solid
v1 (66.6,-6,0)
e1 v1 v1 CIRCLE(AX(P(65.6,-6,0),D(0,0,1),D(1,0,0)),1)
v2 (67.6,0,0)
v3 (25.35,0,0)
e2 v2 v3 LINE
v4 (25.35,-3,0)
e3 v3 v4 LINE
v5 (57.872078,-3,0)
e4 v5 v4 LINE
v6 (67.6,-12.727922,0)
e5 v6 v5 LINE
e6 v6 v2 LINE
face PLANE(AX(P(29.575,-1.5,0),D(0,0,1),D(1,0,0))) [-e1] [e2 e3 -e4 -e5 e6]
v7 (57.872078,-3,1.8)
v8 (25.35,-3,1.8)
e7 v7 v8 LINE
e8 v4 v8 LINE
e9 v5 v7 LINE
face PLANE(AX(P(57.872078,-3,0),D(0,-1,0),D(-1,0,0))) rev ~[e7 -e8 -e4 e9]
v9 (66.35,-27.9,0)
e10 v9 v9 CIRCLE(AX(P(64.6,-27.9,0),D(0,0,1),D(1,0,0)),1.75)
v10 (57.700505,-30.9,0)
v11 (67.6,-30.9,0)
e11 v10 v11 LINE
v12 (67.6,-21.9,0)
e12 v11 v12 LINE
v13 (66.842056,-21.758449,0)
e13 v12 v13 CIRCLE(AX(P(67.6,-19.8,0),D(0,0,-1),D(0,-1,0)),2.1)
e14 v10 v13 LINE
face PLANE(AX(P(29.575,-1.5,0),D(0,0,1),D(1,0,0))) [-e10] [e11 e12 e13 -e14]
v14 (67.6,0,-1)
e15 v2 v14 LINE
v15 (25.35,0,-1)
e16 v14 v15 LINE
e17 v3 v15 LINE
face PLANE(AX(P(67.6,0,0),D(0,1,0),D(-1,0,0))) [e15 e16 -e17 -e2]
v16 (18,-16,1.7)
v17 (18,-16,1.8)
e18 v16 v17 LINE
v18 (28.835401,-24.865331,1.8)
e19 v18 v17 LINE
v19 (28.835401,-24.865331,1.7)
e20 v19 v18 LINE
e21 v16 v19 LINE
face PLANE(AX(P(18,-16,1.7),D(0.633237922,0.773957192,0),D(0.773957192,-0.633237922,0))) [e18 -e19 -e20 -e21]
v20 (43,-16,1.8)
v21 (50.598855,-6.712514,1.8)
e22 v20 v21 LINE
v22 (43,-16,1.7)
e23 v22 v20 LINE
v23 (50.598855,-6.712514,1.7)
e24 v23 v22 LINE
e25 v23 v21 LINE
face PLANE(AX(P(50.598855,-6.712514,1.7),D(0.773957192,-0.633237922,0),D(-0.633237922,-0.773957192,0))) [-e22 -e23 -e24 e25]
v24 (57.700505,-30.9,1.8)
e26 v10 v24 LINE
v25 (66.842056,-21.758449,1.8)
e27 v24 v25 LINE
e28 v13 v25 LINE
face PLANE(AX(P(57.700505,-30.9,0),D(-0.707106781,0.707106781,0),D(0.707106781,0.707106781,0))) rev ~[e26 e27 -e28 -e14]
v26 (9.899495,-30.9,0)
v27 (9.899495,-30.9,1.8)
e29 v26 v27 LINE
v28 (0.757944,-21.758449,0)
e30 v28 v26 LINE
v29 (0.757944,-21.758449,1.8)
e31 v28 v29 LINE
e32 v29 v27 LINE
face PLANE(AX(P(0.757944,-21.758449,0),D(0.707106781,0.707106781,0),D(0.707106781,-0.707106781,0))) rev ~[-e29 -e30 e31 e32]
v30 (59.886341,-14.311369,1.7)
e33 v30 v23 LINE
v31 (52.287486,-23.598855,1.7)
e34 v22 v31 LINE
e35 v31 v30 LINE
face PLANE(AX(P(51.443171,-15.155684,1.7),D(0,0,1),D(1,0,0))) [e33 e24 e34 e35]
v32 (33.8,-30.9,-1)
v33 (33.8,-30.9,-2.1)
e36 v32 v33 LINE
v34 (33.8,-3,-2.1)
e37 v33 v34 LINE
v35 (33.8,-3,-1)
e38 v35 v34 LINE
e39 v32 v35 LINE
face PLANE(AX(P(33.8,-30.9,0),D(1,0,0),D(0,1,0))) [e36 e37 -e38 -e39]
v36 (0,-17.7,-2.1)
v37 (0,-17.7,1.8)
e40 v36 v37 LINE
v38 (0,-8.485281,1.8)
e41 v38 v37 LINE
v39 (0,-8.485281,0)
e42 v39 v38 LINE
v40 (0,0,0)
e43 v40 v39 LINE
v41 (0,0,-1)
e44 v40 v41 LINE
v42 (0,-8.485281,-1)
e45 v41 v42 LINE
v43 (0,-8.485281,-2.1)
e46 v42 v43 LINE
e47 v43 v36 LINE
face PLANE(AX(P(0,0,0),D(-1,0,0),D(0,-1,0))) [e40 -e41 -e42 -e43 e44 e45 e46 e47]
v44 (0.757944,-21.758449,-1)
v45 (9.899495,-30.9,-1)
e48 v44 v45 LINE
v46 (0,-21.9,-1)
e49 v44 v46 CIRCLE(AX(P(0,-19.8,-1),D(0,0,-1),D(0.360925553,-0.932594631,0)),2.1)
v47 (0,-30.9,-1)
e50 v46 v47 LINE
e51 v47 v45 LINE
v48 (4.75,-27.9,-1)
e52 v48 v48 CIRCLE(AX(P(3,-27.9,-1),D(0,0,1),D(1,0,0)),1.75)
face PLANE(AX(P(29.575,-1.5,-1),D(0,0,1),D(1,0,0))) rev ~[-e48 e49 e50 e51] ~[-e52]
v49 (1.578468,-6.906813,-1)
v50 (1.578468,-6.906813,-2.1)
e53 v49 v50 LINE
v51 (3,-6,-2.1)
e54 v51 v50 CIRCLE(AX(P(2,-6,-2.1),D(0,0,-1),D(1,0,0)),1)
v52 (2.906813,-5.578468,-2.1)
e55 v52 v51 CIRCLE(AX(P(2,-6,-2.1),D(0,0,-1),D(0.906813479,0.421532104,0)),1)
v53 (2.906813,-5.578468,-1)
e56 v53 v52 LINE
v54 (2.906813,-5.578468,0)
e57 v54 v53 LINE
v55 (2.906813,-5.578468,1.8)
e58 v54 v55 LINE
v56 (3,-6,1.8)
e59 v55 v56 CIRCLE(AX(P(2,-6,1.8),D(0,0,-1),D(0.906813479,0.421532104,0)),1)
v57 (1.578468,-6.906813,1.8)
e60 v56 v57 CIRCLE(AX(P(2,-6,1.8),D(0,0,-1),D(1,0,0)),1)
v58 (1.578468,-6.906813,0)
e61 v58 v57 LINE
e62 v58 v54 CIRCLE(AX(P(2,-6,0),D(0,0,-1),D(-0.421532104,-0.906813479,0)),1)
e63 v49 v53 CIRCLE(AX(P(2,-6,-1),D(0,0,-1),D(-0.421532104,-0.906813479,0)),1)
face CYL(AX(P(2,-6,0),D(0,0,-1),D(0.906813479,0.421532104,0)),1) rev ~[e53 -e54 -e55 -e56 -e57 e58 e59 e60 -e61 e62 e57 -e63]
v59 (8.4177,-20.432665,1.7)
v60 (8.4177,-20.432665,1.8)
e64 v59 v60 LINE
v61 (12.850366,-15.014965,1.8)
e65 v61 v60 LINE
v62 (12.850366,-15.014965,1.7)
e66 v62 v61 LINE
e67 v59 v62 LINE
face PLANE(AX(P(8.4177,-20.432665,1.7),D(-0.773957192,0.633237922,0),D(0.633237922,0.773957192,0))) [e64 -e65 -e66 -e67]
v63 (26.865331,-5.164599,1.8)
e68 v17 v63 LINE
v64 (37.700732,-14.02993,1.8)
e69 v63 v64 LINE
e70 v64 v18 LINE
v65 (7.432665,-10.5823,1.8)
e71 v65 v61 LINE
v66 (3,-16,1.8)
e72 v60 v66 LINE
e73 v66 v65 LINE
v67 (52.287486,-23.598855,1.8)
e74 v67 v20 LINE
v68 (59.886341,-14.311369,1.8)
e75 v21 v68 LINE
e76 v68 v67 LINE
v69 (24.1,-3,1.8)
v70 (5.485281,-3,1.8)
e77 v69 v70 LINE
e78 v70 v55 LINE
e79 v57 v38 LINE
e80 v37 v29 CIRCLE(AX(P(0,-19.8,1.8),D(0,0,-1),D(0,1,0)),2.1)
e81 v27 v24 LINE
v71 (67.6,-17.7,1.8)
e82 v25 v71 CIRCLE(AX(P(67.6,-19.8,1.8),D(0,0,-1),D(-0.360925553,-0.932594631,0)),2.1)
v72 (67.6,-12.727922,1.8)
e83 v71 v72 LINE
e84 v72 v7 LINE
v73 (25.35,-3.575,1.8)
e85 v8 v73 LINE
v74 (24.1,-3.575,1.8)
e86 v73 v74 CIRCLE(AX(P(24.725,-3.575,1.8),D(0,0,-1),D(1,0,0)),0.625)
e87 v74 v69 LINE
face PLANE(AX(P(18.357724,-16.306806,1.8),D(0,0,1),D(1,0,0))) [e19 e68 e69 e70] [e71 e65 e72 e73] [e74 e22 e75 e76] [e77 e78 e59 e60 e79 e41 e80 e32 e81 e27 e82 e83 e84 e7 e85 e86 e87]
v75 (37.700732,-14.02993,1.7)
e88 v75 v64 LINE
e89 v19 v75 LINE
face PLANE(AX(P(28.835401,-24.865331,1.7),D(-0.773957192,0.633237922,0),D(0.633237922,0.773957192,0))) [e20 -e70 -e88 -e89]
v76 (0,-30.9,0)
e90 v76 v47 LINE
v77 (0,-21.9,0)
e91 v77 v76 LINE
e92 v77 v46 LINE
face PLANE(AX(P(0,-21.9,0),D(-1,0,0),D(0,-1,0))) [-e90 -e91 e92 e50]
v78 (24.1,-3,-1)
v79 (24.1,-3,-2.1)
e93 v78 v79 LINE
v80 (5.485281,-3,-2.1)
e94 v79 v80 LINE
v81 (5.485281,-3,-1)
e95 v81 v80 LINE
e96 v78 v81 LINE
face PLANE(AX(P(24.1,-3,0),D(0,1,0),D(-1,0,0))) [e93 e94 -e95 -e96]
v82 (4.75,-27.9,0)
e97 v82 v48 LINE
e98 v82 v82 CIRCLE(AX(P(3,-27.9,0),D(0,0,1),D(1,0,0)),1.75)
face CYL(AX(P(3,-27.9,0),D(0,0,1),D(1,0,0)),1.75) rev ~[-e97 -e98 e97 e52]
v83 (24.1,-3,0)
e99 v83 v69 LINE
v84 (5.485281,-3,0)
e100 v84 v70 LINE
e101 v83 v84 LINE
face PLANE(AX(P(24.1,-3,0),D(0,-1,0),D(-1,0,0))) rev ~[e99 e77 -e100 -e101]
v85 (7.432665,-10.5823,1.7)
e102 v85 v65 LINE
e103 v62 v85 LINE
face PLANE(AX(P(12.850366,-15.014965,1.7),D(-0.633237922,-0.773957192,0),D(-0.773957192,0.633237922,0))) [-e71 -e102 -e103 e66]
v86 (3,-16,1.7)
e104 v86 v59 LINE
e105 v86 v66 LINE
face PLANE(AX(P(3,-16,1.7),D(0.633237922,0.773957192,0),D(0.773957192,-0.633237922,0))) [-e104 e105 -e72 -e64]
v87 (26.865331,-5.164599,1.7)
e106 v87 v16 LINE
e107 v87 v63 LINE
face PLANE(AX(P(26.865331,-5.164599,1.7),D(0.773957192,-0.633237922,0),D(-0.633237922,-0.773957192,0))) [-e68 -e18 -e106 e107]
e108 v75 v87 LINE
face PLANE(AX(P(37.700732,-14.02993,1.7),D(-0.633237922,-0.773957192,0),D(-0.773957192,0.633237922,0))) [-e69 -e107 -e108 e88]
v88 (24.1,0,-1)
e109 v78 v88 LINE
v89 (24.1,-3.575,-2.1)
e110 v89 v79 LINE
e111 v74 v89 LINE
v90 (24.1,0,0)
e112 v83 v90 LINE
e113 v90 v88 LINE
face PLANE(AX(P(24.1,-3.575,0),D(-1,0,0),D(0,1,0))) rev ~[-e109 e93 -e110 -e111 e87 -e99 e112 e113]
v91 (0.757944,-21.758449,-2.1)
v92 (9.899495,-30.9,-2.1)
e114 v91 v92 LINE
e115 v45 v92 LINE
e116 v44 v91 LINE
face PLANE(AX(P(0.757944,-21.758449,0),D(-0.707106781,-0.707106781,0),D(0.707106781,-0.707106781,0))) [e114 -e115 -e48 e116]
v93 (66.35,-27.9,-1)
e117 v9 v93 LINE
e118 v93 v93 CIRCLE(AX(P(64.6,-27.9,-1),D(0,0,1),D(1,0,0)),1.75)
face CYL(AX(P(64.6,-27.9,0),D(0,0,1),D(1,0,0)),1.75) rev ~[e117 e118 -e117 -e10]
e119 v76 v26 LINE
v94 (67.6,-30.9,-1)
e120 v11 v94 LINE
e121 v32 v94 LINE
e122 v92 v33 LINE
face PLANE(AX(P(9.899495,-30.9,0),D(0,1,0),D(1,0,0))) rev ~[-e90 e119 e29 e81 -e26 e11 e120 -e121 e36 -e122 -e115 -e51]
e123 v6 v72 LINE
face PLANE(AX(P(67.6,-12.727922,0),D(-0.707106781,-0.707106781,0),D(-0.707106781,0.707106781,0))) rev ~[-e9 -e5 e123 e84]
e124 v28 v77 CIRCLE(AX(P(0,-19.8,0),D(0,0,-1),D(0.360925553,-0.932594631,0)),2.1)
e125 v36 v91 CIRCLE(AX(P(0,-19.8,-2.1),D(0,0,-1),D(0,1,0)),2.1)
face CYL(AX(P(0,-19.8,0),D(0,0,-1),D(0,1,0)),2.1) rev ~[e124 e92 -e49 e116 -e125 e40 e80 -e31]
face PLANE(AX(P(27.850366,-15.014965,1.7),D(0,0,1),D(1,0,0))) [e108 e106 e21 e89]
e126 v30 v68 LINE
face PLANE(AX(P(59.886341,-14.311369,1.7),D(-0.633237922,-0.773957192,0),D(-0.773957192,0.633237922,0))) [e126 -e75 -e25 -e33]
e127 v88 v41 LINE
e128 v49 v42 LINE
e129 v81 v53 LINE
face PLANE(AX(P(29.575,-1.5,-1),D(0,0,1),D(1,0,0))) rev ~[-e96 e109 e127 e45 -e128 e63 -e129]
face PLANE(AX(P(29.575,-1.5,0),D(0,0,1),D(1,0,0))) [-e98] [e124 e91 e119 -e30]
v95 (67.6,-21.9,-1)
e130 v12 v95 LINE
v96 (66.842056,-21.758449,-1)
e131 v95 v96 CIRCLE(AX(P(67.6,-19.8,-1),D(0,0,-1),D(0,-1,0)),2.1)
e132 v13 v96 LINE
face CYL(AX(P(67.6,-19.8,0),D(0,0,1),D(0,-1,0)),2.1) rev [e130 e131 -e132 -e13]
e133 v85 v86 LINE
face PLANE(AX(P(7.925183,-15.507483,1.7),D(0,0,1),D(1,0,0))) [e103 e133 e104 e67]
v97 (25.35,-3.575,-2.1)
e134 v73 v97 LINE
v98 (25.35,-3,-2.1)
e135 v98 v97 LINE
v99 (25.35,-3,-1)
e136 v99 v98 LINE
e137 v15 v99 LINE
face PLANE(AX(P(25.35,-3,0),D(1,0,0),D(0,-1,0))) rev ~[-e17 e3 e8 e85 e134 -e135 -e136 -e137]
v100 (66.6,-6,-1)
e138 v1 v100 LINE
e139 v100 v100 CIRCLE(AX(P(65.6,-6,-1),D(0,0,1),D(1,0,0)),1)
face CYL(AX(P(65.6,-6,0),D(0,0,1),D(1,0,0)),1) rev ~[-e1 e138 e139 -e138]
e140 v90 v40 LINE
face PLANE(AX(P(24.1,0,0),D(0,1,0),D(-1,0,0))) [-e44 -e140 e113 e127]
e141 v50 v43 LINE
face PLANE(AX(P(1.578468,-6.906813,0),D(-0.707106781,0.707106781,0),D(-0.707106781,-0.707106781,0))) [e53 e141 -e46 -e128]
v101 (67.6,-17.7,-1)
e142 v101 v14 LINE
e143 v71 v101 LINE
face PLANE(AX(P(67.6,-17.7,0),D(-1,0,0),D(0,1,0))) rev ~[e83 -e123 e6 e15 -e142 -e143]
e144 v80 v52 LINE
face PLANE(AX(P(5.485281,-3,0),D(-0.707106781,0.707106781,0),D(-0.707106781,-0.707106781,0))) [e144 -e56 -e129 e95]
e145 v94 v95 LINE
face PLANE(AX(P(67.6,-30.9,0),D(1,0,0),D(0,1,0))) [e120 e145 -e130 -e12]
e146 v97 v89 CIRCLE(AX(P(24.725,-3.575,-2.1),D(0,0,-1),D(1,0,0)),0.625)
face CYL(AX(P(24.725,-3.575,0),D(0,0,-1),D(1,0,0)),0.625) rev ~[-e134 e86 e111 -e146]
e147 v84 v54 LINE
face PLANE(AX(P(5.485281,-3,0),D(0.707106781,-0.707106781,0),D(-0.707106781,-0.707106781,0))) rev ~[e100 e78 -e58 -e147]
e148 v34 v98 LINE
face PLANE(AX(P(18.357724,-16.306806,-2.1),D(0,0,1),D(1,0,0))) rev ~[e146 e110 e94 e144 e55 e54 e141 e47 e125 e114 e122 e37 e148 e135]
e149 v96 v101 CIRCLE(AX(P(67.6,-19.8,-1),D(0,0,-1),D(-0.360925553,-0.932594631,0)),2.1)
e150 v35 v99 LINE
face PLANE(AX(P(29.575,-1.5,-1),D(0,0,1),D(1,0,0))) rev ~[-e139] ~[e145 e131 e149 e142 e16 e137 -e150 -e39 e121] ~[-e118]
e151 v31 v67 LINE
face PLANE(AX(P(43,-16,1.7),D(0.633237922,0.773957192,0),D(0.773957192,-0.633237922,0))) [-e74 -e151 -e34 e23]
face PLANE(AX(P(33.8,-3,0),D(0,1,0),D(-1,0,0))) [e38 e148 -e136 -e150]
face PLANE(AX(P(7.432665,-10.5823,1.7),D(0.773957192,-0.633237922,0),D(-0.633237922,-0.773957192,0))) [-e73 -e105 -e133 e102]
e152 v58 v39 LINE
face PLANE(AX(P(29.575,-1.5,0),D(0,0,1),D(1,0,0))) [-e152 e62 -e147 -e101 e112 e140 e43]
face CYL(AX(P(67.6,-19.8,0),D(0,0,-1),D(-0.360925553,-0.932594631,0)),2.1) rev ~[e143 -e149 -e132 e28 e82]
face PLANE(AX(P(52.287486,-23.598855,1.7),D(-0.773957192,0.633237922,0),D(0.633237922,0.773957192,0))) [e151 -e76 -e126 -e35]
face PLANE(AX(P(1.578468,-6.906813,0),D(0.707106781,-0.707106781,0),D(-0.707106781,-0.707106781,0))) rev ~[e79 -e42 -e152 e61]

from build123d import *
from build123d import SkipClean  # not in build123d's __all__

# Parameters (mm, degrees)
F0_W     = 8.45
F0_H     = 3
F0_R     = 1.75
F0_R_2   = 1
F1_DEPTH = 1
F2_DEPTH = 2.1
F3_DEPTH = 1.8
F5_START = 1.7
F5_DEPTH = 0.3


with BuildPart() as f1:
    # F0 (on Top) → F1 (new body)
    with BuildSketch(Plane.XY):
        with Locations((29.575, -1.5)):
            Rectangle(F0_W, F0_H)
        Polygon((33.8, 0), (33.8, -3), (57.8720779386, -3), (54.8720779386, 0), align=None)
        Polygon((54.8720779386, 0), (57.8720779386, -3), (67.6, -3), (67.6, 0), align=None)
        with BuildLine():
            Line((66.8420563389, -21.7584487245), (57.7005050634, -30.9))
            Line((57.7005050634, -30.9), (67.6, -30.9))
            Line((67.6, -30.9), (67.6, -21.9))
            ThreePointArc((67.6, -21.9), (67.2144758902, -21.8643088821), (66.8420563389, -21.7584487245))
        make_face()
        with Locations((64.6, -27.9)):
            Circle(F0_R, mode=Mode.SUBTRACT)
        with BuildLine():
            Line((33.8, -3), (33.8, -30.9))
            Line((33.8, -30.9), (57.7005050634, -30.9))
            Line((57.7005050634, -30.9), (66.8420563389, -21.7584487245))
            ThreePointArc((66.8420563389, -21.7584487245), (65.5356911179, -19.4144758902), (67.6, -17.7))
            Line((67.6, -17.7), (67.6, -12.7279220614))
            Line((67.6, -12.7279220614), (57.8720779386, -3))
            Line((57.8720779386, -3), (33.8, -3))
        make_face()
        with BuildLine():
            Line((24.1, -3), (5.4852813742, -3))
            Line((5.4852813742, -3), (2.9068134786, -5.5784678956))
            ThreePointArc((2.9068134786, -5.5784678956), (2.9764254909, -5.7841452787), (3, -6))
            ThreePointArc((3, -6), (2.5378047488, -6.8430694231), (1.5784678956, -6.9068134786))
            Line((1.5784678956, -6.9068134786), (0, -8.4852813742))
            Line((0, -8.4852813742), (0, -17.7))
            ThreePointArc((0, -17.7), (2.0643088821, -19.4144758902), (0.7579436611, -21.7584487245))
            Line((0.7579436611, -21.7584487245), (9.8994949366, -30.9))
            Line((9.8994949366, -30.9), (33.8, -30.9))
            Line((33.8, -30.9), (33.8, -3))
            Line((33.8, -3), (25.35, -3))
            Line((25.35, -3), (25.35, -3.575))
            ThreePointArc((25.35, -3.575), (24.725, -4.2), (24.1, -3.575))
            Line((24.1, -3.575), (24.1, -3))
        make_face()
        with BuildLine():
            Line((9.8994949366, -30.9), (0.7579436611, -21.7584487245))
            ThreePointArc((0.7579436611, -21.7584487245), (0.3855241098, -21.8643088821), (0, -21.9))
            Line((0, -21.9), (0, -30.9))
            Line((0, -30.9), (9.8994949366, -30.9))
        make_face()
        with Locations((3, -27.9)):
            Circle(F0_R, mode=Mode.SUBTRACT)
        Polygon((8.4852813742, 0), (0, 0), (0, -3), (5.4852813742, -3), align=None)
        Polygon((24.1, 0), (8.4852813742, 0), (5.4852813742, -3), (24.1, -3), align=None)
        with BuildLine():
            Line((5.4852813742, -3), (0, -3))
            Line((0, -3), (0, -8.4852813742))
            Line((0, -8.4852813742), (1.5784678956, -6.9068134786))
            ThreePointArc((1.5784678956, -6.9068134786), (1.2928932188, -5.2928932188), (2.9068134786, -5.5784678956))
            Line((2.9068134786, -5.5784678956), (5.4852813742, -3))
        make_face()
        Polygon((67.6, -3), (57.8720779386, -3), (67.6, -12.7279220614), align=None)
        with Locations((65.6, -6)):
            Circle(F0_R_2, mode=Mode.SUBTRACT)
    extrude(amount=-F1_DEPTH)

    # F0 (on Top) → F2 (join)
    with BuildSketch(Plane.XY):
        with BuildLine():
            Line((24.1, -3), (5.4852813742, -3))
            Line((5.4852813742, -3), (2.9068134786, -5.5784678956))
            ThreePointArc((2.9068134786, -5.5784678956), (2.9764254909, -5.7841452787), (3, -6))
            ThreePointArc((3, -6), (2.5378047488, -6.8430694231), (1.5784678956, -6.9068134786))
            Line((1.5784678956, -6.9068134786), (0, -8.4852813742))
            Line((0, -8.4852813742), (0, -17.7))
            ThreePointArc((0, -17.7), (2.0643088821, -19.4144758902), (0.7579436611, -21.7584487245))
            Line((0.7579436611, -21.7584487245), (9.8994949366, -30.9))
            Line((9.8994949366, -30.9), (33.8, -30.9))
            Line((33.8, -30.9), (33.8, -3))
            Line((33.8, -3), (25.35, -3))
            Line((25.35, -3), (25.35, -3.575))
            ThreePointArc((25.35, -3.575), (24.725, -4.2), (24.1, -3.575))
            Line((24.1, -3.575), (24.1, -3))
        make_face()
    with SkipClean():  # cleaning this boolean's faces spoils the solid; the shape is the same uncleaned
        extrude(amount=-F2_DEPTH)

    # F0 (on Top) → F3 (join)
    with BuildSketch(Plane.XY):
        with BuildLine():
            Line((24.1, -3), (5.4852813742, -3))
            Line((5.4852813742, -3), (2.9068134786, -5.5784678956))
            ThreePointArc((2.9068134786, -5.5784678956), (2.9764254909, -5.7841452787), (3, -6))
            ThreePointArc((3, -6), (2.5378047488, -6.8430694231), (1.5784678956, -6.9068134786))
            Line((1.5784678956, -6.9068134786), (0, -8.4852813742))
            Line((0, -8.4852813742), (0, -17.7))
            ThreePointArc((0, -17.7), (2.0643088821, -19.4144758902), (0.7579436611, -21.7584487245))
            Line((0.7579436611, -21.7584487245), (9.8994949366, -30.9))
            Line((9.8994949366, -30.9), (33.8, -30.9))
            Line((33.8, -30.9), (33.8, -3))
            Line((33.8, -3), (25.35, -3))
            Line((25.35, -3), (25.35, -3.575))
            ThreePointArc((25.35, -3.575), (24.725, -4.2), (24.1, -3.575))
            Line((24.1, -3.575), (24.1, -3))
        make_face()
        with BuildLine():
            Line((33.8, -3), (33.8, -30.9))
            Line((33.8, -30.9), (57.7005050634, -30.9))
            Line((57.7005050634, -30.9), (66.8420563389, -21.7584487245))
            ThreePointArc((66.8420563389, -21.7584487245), (65.5356911179, -19.4144758902), (67.6, -17.7))
            Line((67.6, -17.7), (67.6, -12.7279220614))
            Line((67.6, -12.7279220614), (57.8720779386, -3))
            Line((57.8720779386, -3), (33.8, -3))
        make_face()
    extrude(amount=F3_DEPTH)

    # F4 (on Top) → F5 (cut)
    with BuildSketch(Plane.XY.offset(F5_START)):
        Polygon((8.4177003427, -20.4326654506), (12.8503657933, -15.014965108), (7.4326654506, -10.5822996573), (3, -16), align=None)
        Polygon((37.7007315866, -14.0299302159), (26.8653309013, -5.1645993147), (18, -16), (28.8354006853, -24.8653309013), align=None)
        Polygon((52.2874863017, -23.5988550582), (59.8863413599, -14.3113687565), (50.5988550582, -6.7125136983), (43, -16), align=None)
    extrude(amount=F5_DEPTH, mode=Mode.SUBTRACT)


solid = f1.part
